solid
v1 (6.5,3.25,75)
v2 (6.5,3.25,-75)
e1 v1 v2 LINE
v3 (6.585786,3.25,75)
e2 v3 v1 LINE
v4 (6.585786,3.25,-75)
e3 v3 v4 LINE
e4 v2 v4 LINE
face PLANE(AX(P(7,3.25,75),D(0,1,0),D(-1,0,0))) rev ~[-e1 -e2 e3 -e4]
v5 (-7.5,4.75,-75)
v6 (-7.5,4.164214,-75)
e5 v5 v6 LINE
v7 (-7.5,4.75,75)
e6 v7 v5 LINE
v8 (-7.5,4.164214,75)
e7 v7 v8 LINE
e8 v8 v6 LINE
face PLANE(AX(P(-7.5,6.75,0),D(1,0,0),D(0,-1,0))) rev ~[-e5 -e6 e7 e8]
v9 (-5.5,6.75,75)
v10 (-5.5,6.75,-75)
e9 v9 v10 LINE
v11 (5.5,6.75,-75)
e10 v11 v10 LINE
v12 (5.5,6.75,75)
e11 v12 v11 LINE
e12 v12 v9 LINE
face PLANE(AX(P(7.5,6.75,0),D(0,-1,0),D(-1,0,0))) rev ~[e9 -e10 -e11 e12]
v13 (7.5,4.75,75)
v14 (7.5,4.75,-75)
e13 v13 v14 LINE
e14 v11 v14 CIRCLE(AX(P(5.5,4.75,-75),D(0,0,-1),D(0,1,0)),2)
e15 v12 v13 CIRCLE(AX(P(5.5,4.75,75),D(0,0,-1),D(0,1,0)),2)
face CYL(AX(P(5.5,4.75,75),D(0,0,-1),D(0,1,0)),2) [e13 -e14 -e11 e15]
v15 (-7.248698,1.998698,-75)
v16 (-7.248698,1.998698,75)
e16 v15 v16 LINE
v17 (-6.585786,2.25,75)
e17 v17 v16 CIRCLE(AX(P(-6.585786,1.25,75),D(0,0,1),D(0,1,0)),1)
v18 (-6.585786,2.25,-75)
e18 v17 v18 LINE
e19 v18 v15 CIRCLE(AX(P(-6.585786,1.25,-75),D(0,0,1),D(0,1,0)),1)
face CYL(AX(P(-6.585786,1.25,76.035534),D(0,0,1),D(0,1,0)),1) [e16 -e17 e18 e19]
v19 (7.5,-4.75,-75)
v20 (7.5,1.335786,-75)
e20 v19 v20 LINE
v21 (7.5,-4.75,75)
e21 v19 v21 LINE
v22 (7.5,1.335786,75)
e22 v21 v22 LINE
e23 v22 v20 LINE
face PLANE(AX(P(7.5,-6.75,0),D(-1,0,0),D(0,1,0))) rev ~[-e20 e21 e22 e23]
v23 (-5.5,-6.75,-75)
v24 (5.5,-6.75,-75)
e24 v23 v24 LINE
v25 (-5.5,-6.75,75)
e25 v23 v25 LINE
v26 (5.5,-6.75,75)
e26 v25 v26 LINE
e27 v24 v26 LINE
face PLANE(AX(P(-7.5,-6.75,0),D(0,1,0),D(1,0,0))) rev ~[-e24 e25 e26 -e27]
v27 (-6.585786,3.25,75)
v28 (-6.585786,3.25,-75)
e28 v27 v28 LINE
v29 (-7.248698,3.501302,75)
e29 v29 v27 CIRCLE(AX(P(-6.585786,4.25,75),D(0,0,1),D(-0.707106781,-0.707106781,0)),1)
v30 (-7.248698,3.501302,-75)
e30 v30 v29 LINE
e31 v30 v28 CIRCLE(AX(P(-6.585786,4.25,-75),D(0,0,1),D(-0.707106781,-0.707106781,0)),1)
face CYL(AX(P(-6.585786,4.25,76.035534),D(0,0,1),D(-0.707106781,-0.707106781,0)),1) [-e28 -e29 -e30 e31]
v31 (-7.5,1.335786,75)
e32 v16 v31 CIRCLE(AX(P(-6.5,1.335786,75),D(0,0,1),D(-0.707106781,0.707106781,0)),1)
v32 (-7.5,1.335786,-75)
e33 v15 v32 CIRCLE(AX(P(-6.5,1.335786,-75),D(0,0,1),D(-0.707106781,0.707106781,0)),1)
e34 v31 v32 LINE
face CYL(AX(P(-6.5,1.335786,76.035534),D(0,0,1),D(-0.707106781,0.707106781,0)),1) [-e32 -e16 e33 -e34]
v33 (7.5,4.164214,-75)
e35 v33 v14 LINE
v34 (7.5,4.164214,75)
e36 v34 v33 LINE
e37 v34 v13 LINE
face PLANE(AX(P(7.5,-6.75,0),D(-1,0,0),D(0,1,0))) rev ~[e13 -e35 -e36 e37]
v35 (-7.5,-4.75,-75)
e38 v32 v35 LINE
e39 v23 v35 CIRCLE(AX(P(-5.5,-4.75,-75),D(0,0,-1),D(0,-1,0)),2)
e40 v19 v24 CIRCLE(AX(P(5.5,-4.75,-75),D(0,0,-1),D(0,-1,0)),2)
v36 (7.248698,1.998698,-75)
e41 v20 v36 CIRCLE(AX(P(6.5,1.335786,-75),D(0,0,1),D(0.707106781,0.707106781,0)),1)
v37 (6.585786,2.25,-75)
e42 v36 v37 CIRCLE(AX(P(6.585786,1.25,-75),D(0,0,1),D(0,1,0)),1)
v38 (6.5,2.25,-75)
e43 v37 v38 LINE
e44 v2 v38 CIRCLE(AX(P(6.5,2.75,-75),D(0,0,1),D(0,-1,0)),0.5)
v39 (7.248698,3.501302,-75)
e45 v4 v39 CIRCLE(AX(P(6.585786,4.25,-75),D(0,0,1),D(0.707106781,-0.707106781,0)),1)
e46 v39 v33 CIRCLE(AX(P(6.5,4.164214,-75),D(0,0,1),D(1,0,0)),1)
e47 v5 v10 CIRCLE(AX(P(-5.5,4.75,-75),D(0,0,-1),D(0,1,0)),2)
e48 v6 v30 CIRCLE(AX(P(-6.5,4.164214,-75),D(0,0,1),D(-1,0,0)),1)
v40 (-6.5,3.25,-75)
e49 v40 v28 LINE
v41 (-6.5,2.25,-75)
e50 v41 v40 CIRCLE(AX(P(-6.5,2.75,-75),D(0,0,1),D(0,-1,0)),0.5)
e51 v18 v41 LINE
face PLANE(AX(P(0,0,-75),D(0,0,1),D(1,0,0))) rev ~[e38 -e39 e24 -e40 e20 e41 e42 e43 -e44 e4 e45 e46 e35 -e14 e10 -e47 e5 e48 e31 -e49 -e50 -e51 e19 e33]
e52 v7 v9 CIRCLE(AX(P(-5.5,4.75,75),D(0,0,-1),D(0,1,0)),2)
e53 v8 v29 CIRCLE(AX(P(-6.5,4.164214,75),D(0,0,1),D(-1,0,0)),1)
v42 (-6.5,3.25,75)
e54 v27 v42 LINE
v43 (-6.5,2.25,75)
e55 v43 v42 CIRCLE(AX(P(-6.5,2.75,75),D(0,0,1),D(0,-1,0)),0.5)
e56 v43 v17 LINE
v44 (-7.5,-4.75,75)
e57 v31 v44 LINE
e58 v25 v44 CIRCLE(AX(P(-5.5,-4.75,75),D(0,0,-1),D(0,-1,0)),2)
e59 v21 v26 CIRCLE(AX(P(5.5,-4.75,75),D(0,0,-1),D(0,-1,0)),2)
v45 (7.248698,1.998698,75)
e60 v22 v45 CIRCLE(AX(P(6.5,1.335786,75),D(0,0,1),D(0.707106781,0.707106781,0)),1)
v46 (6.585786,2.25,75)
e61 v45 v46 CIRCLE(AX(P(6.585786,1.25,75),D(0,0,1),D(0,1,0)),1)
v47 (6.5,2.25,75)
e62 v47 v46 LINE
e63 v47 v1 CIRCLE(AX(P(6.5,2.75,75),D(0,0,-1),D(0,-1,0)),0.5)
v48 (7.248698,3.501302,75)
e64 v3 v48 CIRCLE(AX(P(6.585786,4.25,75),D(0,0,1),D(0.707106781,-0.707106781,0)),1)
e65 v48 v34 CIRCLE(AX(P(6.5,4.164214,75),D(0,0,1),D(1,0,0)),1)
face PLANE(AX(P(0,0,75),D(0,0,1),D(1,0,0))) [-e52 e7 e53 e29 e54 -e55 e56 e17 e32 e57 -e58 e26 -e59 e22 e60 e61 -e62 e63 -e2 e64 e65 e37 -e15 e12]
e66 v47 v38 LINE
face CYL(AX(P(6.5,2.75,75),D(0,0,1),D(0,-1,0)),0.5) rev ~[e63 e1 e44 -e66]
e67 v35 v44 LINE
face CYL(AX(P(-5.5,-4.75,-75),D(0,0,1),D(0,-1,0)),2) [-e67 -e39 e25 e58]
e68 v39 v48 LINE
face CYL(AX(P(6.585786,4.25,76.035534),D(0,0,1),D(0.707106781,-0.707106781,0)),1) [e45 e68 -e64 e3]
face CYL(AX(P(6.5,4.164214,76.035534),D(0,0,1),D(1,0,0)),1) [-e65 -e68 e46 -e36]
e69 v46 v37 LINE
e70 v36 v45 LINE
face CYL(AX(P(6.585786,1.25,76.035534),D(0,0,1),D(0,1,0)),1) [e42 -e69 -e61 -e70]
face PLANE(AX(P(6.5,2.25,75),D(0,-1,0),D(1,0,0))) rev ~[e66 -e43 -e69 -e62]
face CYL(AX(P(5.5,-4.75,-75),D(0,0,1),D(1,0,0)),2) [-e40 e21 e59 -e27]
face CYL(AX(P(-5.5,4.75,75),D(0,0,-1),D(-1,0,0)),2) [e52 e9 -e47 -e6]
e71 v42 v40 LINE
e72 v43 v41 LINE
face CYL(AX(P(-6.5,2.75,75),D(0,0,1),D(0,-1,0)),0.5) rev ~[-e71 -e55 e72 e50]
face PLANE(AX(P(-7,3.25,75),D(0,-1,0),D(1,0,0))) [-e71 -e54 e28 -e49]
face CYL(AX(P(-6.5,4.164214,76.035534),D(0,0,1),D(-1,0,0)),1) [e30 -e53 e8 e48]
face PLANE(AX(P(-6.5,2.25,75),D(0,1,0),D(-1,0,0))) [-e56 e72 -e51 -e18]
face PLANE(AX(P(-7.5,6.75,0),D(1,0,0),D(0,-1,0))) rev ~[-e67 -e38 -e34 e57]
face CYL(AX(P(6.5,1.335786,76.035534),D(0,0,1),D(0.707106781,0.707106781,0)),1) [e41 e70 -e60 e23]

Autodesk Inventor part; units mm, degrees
ref_plane "YZ Plane" through (0, 0, 0) normal (1, 0, 0) x (0, 1, 0)
ref_plane "XZ Plane" through (0, 0, 0) normal (0, 1, 0) x (-1, 0, 0)
ref_plane "XY Plane" through (0, 0, 0) normal (0, 0, 1) x (1, 0, 0)
sketch "Sketch1" plane through (0, 0, 0) normal (0, 0, 1) x (1, 0, 0)
  line L0 (-7.5, -6.75) -> (7.5, -6.75)
  line L1 (7.5, -6.75) -> (7.5, 6.75)
  line L2 (7.5, 6.75) -> (-7.5, 6.75)
  line L3 (-7.5, 6.75) -> (-7.5, -6.75)
  line L4 (-7.5, -6.75) -> (7.5, 6.75) construction
  line L5 (7.5, -6.75) -> (-7.5, 6.75) construction
  point P0 (0, 0)
  dimension "d0" = 15
  dimension "d1" = 13.5
extrude "Extrusion1" add sketch "Sketch1" along normal mid plane 150
sketch "Sketch2" plane through (0, 0, 75) normal (0, 0, 1) x (1, 0, 0)
  line L0 (7.5, 6.75) -> (-7.5, 6.75) projected
  line L1 (-7.5, 6.75) -> (-7.5, -6.75) projected
  line L2 (-7.5, 3.75) -> (-7, 3.25)
  line L3 (-7, 3.25) -> (-6.5, 3.25)
  line L4 (-6.5, 2.25) -> (-7, 2.25)
  line L5 (-7, 2.25) -> (-7.5, 1.75)
  arc A0 (-6.5, 2.25) -> (-6.5, 3.25) centre (-6.5, 2.75) ccw
  line L6 (-7.5, 1.75) -> (-7.5, 3.75)
  point P0 (0, 0)
  dimension "d4" = 4
  dimension "d5" = 1
  dimension "d6" = 0.5
  dimension "d7" = 0.5
  dimension "d8" = 2
extrude "Extrusion2" cut sketch "Sketch2" against normal up to next
mirror "Mirror1" about plane through (0, 0, 0) normal (1, 0, 0) of "Extrusion2"
fillet "Fillet1" radius 2 4 edges at (7.5, 6.75, 0) (-7.5, 6.75, 0) (7.5, -6.75, 0) (-7.5, -6.75, 0)
fillet "Fillet2" radius 1 8 edges at (-7, 2.25, 0) (-7.5, 1.75, 0) (-7, 3.25, 0) (-7.5, 3.75, 0) (7, 2.25, 0) (7.5, 1.75, 0) (7.5, 3.75, 0) (7, 3.25, 0)
properties part number "Rail-06"
